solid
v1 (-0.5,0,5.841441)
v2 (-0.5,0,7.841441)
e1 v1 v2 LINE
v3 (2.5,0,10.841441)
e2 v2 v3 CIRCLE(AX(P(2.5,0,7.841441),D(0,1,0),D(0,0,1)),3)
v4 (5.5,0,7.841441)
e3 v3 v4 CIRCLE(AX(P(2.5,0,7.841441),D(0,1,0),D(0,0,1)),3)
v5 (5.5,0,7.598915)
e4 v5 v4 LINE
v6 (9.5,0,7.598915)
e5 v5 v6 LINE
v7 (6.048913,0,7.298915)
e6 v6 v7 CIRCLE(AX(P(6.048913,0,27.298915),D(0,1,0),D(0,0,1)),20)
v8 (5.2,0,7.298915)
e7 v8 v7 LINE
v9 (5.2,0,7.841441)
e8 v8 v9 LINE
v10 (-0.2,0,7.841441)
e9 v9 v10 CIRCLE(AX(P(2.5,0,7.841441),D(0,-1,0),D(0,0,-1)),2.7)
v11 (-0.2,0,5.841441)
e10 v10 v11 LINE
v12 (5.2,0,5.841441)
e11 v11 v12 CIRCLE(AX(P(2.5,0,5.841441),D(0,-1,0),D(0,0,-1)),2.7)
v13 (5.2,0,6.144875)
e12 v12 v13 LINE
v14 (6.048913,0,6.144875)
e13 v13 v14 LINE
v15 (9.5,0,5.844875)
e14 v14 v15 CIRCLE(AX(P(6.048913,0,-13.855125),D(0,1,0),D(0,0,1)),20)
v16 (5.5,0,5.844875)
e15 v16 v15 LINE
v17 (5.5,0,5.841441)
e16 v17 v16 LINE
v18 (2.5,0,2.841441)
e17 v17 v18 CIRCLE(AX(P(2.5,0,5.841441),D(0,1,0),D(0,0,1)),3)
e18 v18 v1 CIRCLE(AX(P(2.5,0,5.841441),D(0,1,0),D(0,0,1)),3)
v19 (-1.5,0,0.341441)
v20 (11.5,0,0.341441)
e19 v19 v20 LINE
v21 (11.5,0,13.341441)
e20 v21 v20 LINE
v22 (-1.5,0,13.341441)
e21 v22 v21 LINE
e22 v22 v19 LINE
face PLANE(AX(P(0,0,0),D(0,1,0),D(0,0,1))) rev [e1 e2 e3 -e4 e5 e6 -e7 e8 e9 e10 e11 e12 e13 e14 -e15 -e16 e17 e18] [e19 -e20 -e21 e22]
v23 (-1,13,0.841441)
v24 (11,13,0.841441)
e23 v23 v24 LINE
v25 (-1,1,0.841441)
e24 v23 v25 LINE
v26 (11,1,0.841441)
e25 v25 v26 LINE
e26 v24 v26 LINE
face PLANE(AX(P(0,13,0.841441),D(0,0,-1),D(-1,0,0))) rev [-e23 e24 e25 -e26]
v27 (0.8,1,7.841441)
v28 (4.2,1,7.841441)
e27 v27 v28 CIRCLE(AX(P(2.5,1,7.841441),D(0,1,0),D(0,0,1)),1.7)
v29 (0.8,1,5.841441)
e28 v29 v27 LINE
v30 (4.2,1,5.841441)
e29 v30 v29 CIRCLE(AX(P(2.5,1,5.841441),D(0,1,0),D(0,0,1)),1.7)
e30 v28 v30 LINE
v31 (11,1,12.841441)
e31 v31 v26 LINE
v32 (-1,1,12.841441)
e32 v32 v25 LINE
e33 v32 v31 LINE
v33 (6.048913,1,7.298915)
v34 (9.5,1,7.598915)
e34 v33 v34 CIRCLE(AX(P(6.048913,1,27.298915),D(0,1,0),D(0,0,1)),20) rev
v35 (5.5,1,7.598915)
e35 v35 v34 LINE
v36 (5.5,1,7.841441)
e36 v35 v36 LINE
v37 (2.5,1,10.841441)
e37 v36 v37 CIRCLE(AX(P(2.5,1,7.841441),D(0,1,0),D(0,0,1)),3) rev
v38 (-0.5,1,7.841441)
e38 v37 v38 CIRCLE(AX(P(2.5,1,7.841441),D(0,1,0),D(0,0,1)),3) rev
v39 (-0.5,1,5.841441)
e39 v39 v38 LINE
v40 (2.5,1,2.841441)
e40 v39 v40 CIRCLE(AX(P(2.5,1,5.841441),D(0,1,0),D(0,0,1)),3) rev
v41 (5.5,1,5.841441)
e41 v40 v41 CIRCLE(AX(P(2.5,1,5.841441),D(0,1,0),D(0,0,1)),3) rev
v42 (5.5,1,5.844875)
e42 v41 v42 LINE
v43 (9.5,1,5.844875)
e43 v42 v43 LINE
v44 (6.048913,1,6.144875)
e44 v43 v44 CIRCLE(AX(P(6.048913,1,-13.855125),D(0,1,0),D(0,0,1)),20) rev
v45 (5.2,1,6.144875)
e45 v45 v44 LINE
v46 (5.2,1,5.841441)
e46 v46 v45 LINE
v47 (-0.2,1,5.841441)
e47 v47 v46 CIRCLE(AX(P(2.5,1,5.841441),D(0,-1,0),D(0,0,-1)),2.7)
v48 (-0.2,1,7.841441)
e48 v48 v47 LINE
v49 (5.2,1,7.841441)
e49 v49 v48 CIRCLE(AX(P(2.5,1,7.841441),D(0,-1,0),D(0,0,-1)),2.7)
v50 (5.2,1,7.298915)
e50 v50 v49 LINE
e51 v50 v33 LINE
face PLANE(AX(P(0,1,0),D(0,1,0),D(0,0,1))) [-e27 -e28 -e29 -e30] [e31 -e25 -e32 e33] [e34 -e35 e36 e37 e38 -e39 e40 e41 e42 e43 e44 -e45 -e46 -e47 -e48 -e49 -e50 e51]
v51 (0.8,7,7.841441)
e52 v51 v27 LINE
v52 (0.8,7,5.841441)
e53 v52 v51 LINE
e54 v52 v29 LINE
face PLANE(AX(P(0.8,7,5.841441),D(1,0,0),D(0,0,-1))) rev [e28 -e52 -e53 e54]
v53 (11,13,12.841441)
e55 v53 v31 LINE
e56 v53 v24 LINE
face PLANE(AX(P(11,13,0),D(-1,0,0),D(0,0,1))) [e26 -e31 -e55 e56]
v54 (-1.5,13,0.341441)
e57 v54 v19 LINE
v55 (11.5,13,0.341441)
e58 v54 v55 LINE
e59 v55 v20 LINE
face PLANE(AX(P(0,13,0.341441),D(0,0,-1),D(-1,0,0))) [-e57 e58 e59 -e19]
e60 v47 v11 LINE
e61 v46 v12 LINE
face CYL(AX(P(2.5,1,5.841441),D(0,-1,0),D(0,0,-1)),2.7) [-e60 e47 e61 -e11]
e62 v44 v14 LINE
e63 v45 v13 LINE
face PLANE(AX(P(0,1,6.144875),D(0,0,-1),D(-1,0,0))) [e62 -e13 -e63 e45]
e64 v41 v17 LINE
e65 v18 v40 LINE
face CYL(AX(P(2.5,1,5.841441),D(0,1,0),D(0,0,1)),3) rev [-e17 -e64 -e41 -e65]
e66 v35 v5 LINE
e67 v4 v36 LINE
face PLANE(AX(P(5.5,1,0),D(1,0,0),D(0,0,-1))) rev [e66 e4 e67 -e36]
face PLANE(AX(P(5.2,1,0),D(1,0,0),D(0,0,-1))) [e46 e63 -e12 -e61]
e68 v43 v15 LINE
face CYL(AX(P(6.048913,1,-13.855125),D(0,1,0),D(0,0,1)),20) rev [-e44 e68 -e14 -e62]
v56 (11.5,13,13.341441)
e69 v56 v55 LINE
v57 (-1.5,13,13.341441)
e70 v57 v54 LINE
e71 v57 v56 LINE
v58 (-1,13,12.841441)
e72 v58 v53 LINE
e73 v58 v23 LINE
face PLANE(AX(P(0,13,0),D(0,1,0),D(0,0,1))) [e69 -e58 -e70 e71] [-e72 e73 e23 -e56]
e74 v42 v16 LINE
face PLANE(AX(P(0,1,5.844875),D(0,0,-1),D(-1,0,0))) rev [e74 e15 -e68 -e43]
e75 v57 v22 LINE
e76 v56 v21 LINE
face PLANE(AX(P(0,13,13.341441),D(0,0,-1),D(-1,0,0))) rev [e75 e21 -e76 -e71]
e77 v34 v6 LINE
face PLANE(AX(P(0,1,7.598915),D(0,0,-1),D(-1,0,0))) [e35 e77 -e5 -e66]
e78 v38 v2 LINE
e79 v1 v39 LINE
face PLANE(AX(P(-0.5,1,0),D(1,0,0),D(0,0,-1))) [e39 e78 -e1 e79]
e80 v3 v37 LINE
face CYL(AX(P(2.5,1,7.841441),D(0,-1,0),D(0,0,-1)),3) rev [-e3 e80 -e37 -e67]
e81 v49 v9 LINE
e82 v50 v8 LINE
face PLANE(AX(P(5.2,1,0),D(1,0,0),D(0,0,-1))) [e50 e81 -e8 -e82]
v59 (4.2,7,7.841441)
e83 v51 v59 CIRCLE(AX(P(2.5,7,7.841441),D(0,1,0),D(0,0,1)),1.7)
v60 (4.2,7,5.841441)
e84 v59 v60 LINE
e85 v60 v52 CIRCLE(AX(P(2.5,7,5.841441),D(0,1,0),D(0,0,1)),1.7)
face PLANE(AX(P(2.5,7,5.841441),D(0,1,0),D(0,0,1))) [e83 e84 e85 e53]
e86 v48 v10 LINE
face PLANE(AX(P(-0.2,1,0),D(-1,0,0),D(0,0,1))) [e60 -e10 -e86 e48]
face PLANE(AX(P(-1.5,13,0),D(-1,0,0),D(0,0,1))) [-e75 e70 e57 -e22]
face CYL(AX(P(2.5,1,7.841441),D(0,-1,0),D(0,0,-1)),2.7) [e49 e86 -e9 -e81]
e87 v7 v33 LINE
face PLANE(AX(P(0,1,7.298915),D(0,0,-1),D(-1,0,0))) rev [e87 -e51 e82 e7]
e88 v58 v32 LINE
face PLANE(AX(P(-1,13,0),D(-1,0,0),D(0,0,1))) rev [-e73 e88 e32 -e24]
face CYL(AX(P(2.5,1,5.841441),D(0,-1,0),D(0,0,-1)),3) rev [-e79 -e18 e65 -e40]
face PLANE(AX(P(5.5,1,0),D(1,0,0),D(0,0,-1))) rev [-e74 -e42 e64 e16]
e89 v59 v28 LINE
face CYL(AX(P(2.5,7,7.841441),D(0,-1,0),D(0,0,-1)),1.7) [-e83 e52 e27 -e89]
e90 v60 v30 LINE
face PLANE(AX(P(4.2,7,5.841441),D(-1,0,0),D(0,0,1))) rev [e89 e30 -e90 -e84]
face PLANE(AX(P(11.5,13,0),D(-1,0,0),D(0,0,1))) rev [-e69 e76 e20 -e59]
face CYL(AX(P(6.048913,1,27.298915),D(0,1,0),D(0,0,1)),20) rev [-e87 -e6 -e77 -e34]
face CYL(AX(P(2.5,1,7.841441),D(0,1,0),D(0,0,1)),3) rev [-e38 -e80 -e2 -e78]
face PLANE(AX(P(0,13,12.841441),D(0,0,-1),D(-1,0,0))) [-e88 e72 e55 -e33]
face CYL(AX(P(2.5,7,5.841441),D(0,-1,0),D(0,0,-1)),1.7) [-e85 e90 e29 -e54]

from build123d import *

# Parameters (mm, degrees)
SKETCH1_W           = 13
SKETCH1_H           = 13
SKETCH1_W_2         = 12
SKETCH1_H_2         = 12
BOSS_EXTRUDE1_DEPTH = 13
SKETCH1_4_W         = 12
SKETCH1_4_H         = 12
SKETCH1_4_W_2       = 6
SKETCH1_4_H_2       = 8
SKETCH1_4_W_3       = 4
SKETCH1_4_H_3       = 1.754040625
BOSS_EXTRUDE2_DEPTH = 1
SKETCH1_7_W         = 6
SKETCH1_7_H         = 8
SKETCH1_7_W_2       = 4
SKETCH1_7_H_2       = 1.754040625
CUT_EXTRUDE1_DEPTH  = 1
FILLET1_R           = 3
SKETCH3_W           = 0.743374663
SKETCH3_H           = 1.154040625
SKETCH3_W_2         = 0.3
BOSS_EXTRUDE3_DEPTH = 1
FILLET2_R           = 20
BOSS_EXTRUDE4_DEPTH = 6


# Some blends are built 0.0001 mm under size
with BuildPart() as part:
    # Sketch1 → Boss-Extrude1 (new body)
    with BuildSketch(Plane(origin=(0, 0, 0), x_dir=(1, 0, 0), z_dir=(0, 1, 0))):
        with Locations((5, -6.841440964)):
            Rectangle(SKETCH1_W, SKETCH1_H)
        with Locations((5, -6.841440964)):
            Rectangle(SKETCH1_W_2, SKETCH1_H_2, mode=Mode.SUBTRACT)
    extrude(amount=BOSS_EXTRUDE1_DEPTH)

    # Sketch1<4> → Boss-Extrude2 (add)
    # profile 1 of 3: a face of its own
    with BuildSketch(Plane(origin=(0, 0, 0), x_dir=(1, 0, 0), z_dir=(0, 1, 0))):
        with Locations((5, -6.841440964)):
            Rectangle(SKETCH1_4_W, SKETCH1_4_H)
        Polygon((-0.500000048, -10.841440964), (-0.500000048, -2.841440964), (5.499999952, -2.841440964), (5.499999952, -5.84487475), (9.499999952, -5.84487475), (9.499999952, -7.598915375), (5.499999952, -7.598915375), (5.499999952, -10.841440964), align=None, mode=Mode.SUBTRACT)
    # profile 2 of 3: a face of its own
    with BuildSketch(Plane(origin=(0, 0, 0), x_dir=(1, 0, 0), z_dir=(0, 1, 0))):
        with Locations((2.499999952, -6.841440964)):
            Rectangle(SKETCH1_4_W_2, SKETCH1_4_H_2)
    # profile 3 of 3: a face of its own
    with BuildSketch(Plane(origin=(0, 0, 0), x_dir=(1, 0, 0), z_dir=(0, 1, 0))):
        with Locations((7.499999952, -6.721895063)):
            Rectangle(SKETCH1_4_W_3, SKETCH1_4_H_3)
    extrude(amount=BOSS_EXTRUDE2_DEPTH)

    # Sketch1<7> → Cut-Extrude1 (cut)
    with BuildSketch(Plane(origin=(0, 0, 0), x_dir=(1, 0, 0), z_dir=(0, 1, 0))):
        with Locations((2.499999952, -6.841440964)):
            Rectangle(SKETCH1_7_W, SKETCH1_7_H)
        with Locations((7.499999952, -6.721895063)):
            Rectangle(SKETCH1_7_W_2, SKETCH1_7_H_2)
    extrude(amount=CUT_EXTRUDE1_DEPTH, mode=Mode.SUBTRACT)

    # Fillet1
    fillet1_edges = [part.edges().sort_by_distance(p)[0] for p in [
        (5.499999952, 0.5, 2.841440964),
        (-0.500000048, 0.5, 2.841440964),
        (-0.500000048, 0.5, 10.841440964),
        (5.499999952, 0.5, 10.841440964),
    ]]
    fillet(fillet1_edges, radius=FILLET1_R - 0.0001)  # a hair under: the kernel refuses the full size

    # Sketch3 → Boss-Extrude3 (add)
    with BuildSketch(Plane.XZ):
        with Locations((9.871687284, 6.721895063)):
            Rectangle(SKETCH3_W, SKETCH3_H)
        with BuildLine():
            Line((5.199999952, 7.298915375), (5.199999952, 7.841440964))
            ThreePointArc((5.199999952, 7.841440964), (4.409188261, 9.750629273), (2.499999952, 10.541440964))
            ThreePointArc((2.499999952, 10.541440964), (0.590811643, 9.750629273), (-0.200000048, 7.841440964))
            Line((-0.200000048, 7.841440964), (-0.200000048, 5.841440964))
            ThreePointArc((-0.200000048, 5.841440964), (0.590811643, 3.932252654), (2.499999952, 3.141440964))
            ThreePointArc((2.499999952, 3.141440964), (4.409188261, 3.932252654), (5.199999952, 5.841440964))
            Line((5.199999952, 5.841440964), (5.199999952, 6.14487475))
            Line((5.199999952, 6.14487475), (9.199999952, 6.14487475))
            Line((9.199999952, 6.14487475), (9.199999952, 7.298915375))
            Line((9.199999952, 7.298915375), (5.199999952, 7.298915375))
        make_face()
        with Locations((9.349999952, 6.721895063)):
            Rectangle(SKETCH3_W_2, SKETCH3_H)
    extrude(amount=-BOSS_EXTRUDE3_DEPTH)

    # Fillet2
    # the kernel refuses this fillet: 20 mm, written as the material it adds along each edge
    with BuildSketch(Plane(origin=(9.499999952, 0, 7.298915375), x_dir=(0, 0, 1), z_dir=(0, 1, 0)), Plane(origin=(9.499999952, 1, 6.14487475), x_dir=(0, 0, -1), z_dir=(0, -1, 0))) as fillet2_piece_1:
        with BuildLine():
            CenterArc((20, -3.451086785), FILLET2_R, 170.063632928, 9.936367072)
            Line((0, -3.451086785), (0, 0))
            Line((0, 0), (0.3, 0))
        make_face()
    extrude(amount=1)

    # Sketch4 → Boss-Extrude4 (add)
    with BuildSketch(Plane(origin=(0, 1, 0), x_dir=(1, 0, 0), z_dir=(0, 1, 0))):
        with BuildLine():
            Line((4.199999952, -5.841440964), (4.199999952, -7.841440964))
            ThreePointArc((4.199999952, -7.841440964), (2.499999952, -9.541440964), (0.799999952, -7.841440964))
            Line((0.799999952, -7.841440964), (0.799999952, -5.841440964))
            ThreePointArc((0.799999952, -5.841440964), (2.499999952, -4.141440964), (4.199999952, -5.841440964))
        make_face()
    extrude(amount=BOSS_EXTRUDE4_DEPTH)


solid = part.part
